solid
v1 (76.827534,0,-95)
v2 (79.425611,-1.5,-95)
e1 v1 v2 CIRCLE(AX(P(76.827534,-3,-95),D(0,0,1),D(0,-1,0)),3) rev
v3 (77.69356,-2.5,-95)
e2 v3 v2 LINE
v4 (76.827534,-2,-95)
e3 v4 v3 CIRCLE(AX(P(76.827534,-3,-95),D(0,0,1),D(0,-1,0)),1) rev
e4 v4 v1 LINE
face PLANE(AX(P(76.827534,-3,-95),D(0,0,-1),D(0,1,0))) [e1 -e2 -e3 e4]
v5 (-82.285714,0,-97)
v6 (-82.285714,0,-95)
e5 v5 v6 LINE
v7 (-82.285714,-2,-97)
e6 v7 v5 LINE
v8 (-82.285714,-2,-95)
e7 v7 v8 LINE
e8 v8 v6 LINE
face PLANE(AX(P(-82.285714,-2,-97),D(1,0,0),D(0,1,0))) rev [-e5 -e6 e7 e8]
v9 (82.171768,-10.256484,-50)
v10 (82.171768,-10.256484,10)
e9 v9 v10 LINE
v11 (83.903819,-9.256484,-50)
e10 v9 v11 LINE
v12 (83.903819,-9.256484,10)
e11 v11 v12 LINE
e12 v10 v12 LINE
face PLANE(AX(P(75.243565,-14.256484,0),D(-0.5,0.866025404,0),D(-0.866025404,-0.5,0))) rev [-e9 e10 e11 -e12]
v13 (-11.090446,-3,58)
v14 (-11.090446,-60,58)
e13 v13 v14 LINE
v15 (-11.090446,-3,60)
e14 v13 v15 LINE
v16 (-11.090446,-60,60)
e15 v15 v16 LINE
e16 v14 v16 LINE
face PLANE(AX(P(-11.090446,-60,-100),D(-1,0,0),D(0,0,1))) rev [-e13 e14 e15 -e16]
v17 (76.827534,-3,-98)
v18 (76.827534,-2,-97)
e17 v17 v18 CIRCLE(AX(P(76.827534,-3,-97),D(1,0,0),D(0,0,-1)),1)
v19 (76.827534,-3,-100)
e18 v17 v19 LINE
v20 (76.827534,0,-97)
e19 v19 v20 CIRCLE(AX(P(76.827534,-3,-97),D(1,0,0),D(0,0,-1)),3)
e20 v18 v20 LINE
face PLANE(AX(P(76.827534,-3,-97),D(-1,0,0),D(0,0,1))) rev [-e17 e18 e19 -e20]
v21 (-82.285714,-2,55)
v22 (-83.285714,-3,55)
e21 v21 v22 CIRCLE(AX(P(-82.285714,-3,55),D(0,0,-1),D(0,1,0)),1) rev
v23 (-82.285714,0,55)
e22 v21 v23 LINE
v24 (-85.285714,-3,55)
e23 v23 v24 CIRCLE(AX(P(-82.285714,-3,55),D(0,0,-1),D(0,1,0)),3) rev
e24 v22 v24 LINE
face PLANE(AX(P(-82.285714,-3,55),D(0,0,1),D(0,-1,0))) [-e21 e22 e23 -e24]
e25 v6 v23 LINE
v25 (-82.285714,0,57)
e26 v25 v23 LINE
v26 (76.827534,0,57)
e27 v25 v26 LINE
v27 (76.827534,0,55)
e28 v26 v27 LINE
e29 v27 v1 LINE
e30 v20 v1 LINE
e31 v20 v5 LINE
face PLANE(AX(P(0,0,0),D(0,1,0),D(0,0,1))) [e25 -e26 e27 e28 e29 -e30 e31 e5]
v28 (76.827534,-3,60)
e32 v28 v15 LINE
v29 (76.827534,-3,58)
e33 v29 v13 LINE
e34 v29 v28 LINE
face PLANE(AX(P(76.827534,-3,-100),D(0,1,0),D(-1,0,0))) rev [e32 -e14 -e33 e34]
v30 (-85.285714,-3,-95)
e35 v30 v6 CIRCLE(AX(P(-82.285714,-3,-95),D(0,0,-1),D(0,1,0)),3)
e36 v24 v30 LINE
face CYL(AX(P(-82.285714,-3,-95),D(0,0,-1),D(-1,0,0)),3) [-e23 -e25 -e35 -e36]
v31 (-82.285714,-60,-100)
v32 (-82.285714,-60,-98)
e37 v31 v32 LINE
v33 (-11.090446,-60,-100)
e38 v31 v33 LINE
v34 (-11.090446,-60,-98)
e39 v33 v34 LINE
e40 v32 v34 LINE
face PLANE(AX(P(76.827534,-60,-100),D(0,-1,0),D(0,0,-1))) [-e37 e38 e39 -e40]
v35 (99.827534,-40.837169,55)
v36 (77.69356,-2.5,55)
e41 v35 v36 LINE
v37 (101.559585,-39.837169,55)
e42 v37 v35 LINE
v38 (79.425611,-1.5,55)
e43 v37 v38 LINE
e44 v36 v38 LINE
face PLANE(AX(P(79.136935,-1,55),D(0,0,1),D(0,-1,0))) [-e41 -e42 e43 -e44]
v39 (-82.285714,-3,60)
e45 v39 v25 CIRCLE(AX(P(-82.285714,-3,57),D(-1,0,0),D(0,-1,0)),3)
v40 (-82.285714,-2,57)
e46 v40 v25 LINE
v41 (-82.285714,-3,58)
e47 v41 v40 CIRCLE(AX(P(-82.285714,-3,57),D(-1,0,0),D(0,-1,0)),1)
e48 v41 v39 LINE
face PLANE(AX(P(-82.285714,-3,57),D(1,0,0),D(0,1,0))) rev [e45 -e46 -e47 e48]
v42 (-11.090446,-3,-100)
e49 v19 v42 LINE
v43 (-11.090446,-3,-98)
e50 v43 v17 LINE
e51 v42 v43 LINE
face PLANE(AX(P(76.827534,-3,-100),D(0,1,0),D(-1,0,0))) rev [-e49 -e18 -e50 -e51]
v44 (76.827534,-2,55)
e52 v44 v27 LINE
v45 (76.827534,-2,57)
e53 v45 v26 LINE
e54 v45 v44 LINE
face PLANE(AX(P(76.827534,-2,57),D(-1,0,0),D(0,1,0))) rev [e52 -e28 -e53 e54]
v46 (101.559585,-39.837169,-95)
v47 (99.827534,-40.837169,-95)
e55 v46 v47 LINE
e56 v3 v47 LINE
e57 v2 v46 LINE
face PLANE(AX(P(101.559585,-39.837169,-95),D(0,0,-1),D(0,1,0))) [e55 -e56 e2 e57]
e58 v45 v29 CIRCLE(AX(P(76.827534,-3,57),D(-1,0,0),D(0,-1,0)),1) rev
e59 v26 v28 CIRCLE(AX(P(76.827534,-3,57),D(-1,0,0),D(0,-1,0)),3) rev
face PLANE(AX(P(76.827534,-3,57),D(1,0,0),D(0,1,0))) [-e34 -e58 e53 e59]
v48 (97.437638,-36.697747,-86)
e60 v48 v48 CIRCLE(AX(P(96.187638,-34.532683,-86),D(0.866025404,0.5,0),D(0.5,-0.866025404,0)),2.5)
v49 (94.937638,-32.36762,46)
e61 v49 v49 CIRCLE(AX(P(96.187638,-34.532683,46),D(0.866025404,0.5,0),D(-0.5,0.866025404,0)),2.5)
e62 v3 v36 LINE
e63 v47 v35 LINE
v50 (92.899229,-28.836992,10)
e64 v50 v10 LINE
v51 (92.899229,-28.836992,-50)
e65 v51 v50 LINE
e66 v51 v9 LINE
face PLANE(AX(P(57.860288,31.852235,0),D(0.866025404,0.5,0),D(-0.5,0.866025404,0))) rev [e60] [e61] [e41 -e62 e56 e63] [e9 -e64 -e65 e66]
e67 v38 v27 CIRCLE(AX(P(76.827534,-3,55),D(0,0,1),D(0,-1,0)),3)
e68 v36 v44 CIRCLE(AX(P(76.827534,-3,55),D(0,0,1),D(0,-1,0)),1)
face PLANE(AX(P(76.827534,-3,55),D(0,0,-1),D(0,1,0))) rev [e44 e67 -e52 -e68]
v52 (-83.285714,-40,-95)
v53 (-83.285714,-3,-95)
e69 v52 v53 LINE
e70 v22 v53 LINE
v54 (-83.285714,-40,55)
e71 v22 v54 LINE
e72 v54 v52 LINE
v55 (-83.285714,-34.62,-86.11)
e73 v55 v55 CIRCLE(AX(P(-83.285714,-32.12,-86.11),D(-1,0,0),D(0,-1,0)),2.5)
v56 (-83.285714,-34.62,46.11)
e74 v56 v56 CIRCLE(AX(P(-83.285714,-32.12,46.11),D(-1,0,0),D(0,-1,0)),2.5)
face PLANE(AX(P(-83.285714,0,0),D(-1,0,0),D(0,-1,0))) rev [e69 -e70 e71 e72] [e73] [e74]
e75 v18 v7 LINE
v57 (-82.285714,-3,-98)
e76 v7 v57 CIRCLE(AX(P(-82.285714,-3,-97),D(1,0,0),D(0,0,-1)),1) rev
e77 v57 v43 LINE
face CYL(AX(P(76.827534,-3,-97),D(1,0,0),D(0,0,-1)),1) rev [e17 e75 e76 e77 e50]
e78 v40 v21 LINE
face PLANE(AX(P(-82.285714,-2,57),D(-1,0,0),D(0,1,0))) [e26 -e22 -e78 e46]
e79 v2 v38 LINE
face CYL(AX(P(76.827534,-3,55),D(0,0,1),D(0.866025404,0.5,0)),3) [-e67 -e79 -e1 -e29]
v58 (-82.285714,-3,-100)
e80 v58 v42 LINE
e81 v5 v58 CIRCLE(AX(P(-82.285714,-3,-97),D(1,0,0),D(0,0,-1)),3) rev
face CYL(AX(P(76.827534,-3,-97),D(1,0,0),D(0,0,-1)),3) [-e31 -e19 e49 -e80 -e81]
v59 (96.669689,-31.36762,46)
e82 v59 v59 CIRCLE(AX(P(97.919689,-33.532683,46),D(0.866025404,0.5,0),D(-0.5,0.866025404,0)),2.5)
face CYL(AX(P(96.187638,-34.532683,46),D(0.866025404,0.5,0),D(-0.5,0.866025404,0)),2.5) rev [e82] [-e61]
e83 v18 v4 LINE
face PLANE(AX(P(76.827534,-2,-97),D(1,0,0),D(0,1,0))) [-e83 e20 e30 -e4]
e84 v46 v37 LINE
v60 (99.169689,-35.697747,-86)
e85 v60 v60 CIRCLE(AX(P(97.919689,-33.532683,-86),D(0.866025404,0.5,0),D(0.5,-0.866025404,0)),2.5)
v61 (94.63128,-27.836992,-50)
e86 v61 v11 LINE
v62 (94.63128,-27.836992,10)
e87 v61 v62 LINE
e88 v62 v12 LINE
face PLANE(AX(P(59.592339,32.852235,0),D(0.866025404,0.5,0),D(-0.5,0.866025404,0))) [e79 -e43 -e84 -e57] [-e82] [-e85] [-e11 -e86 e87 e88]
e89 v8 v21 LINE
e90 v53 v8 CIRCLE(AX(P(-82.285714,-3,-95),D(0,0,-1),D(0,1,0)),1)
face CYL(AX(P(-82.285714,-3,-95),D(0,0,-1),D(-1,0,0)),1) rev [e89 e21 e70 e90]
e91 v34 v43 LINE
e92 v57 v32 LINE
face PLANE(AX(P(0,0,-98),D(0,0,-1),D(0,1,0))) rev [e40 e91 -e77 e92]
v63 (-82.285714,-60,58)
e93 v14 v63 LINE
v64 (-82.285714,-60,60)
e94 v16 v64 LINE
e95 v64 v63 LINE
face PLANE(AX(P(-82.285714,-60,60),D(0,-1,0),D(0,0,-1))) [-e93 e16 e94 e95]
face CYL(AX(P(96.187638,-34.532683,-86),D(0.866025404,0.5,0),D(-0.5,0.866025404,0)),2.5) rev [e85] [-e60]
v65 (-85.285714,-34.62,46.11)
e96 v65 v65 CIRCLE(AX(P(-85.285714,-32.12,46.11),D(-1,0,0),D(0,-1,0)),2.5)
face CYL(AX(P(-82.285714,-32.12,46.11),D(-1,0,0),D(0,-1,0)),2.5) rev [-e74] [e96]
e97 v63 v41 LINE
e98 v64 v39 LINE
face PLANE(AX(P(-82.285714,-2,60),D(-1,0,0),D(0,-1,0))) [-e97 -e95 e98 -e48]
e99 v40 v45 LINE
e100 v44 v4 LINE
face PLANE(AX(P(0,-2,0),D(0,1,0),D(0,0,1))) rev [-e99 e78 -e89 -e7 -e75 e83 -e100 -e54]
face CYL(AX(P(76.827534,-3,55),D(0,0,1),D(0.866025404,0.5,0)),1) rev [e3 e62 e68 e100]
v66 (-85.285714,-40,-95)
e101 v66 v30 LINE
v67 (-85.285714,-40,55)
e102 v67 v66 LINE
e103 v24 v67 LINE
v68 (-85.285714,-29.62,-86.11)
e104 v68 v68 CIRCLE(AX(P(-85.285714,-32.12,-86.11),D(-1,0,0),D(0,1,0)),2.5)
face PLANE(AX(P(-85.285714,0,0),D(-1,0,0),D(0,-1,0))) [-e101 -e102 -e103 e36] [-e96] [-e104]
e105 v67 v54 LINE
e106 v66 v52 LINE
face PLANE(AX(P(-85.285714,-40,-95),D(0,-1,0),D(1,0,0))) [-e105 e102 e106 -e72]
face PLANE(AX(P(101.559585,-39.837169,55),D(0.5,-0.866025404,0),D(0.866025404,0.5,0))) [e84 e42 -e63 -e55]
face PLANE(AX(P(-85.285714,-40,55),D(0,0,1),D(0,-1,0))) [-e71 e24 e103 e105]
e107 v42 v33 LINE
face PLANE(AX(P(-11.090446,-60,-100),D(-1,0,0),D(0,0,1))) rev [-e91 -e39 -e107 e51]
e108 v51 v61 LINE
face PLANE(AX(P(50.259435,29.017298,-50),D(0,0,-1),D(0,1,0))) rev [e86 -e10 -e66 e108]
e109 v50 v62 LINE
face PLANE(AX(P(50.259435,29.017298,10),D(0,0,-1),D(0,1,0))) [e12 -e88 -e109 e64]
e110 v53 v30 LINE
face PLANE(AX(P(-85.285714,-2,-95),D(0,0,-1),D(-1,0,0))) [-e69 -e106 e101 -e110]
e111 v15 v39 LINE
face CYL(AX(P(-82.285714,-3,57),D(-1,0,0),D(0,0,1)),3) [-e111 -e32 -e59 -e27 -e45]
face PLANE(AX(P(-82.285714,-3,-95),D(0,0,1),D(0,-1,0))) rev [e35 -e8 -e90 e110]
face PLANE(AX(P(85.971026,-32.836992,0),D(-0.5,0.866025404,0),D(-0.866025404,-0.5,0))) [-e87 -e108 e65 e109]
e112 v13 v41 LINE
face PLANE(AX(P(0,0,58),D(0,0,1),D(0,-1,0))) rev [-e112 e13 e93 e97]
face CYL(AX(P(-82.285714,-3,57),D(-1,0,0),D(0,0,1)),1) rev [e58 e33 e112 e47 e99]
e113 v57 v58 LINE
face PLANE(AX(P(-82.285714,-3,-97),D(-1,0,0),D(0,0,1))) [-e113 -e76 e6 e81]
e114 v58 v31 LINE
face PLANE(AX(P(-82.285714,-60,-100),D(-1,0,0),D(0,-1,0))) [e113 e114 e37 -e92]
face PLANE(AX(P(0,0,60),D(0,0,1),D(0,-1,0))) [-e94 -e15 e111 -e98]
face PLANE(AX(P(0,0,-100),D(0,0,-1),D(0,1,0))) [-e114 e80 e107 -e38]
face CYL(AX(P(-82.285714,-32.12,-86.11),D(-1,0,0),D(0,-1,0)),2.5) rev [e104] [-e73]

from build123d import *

# Parameters (mm, degrees)
SKETCH1_W                    = 160
SKETCH1_H                    = 150
BASE_FLANGE1_DEPTH           = 2
EDGE_FLANGE1_START           = -95
EDGE_FLANGE1_DEPTH           = 150
EDGE_FLANGE2_STRIP_W         = 20
EDGE_FLANGE2_STRIP_H         = 2
EDGE_FLANGE2_STRIP_CUT_DEPTH = 150
EDGE_FLANGE2_DEPTH           = 150
EDGE_FLANGE4_DEPTH           = 159.113248654
EDGE_FLANGE5_DEPTH           = 159.113248654
SKETCH32_W                   = 30
SKETCH32_H                   = 21.454922416
CUT_EXTRUDE2_DEPTH           = 10
SKETCH33_W                   = 87.917980444
SKETCH33_H                   = 57
CUT_EXTRUDE3_DEPTH           = 199.782165551
SKETCH38_R                   = 2.5
CUT_EXTRUDE5_DEPTH           = 2
SKETCH39_R                   = 2.5
CUT_EXTRUDE6_DEPTH           = 3


# Read off the part's stored shape, not the designer's step: Edge-Flange1
# Sheet-metal steps are written as plain solids
with BuildPart() as part:
    # Sketch1 → Base-Flange1 (new body)
    with BuildSketch(Plane(origin=(0, 0, 0), x_dir=(1, 0, 0), z_dir=(0, 1, 0))):
        with Locations((-5.285714286, 20)):
            Rectangle(SKETCH1_W, SKETCH1_H)
    extrude(amount=-BASE_FLANGE1_DEPTH)

    # Edge-Flange1 outline → Edge-Flange1 (add)
    with BuildSketch(Plane.XY.offset(EDGE_FLANGE1_START)):
        with BuildLine():
            Line((101.559585176, -39.837168574), (79.42561058, -1.5))
            ThreePointArc((79.42561058, -1.5), (78.327534368, -0.401923789), (76.827534368, 0))
            Line((76.827534368, 0), (74.714285714, 0))
            Line((74.714285714, 0), (74.714285714, -2))
            Line((74.714285714, -2), (76.827534368, -2))
            ThreePointArc((76.827534368, -2), (77.327534368, -2.133974596), (77.693559772, -2.5))
            Line((77.693559772, -2.5), (99.827534368, -40.837168574))
            Line((99.827534368, -40.837168574), (101.559585176, -39.837168574))
        make_face()
    extrude(amount=EDGE_FLANGE1_DEPTH)

    # Edge-Flange2 strip (across the edge) → Edge-Flange2 strip cut (cut)
    with BuildSketch(Plane(origin=(-85.285714286, -2, 55), x_dir=(1, 0, 0), z_dir=(0, 0, -1))):
        with Locations((-7, -1)):
            Rectangle(EDGE_FLANGE2_STRIP_W, EDGE_FLANGE2_STRIP_H)
    extrude(amount=EDGE_FLANGE2_STRIP_CUT_DEPTH, mode=Mode.SUBTRACT)

    # Edge-Flange2 section (across the edge) → Edge-Flange2 (add)
    with BuildSketch(Plane(origin=(-85.285714286, -2, 55), x_dir=(1, 0, 0), z_dir=(0, 0, -1))):
        with BuildLine():
            Line((0, 1), (0, 38))
            Line((0, 38), (2, 38))
            Line((2, 38), (2, 1))
            ThreePointArc((2, 1), (2.292893219, 0.292893219), (3, 0))
            Line((3, 0), (3, -2))
            ThreePointArc((3, -2), (0.878679656, -1.121320344), (0, 1))
        make_face()
    extrude(amount=EDGE_FLANGE2_DEPTH)

    # Edge-Flange4 section (across the edge) → Edge-Flange4 (add)
    with BuildSketch(Plane(origin=(76.827534368, -2, 60), x_dir=(0, 0, -1), z_dir=(-1, 0, 0))):
        with BuildLine():
            Line((0, 1), (0, 58))
            Line((0, 58), (2, 58))
            Line((2, 58), (2, 1))
            ThreePointArc((2, 1), (2.292893219, 0.292893219), (3, 0))
            Line((3, 0), (5, 0))
            Line((5, 0), (5, -2))
            Line((5, -2), (3, -2))
            ThreePointArc((3, -2), (0.878679656, -1.121320344), (0, 1))
        make_face()
    extrude(amount=EDGE_FLANGE4_DEPTH)

    # Edge-Flange5 section (across the edge) → Edge-Flange5 (add)
    with BuildSketch(Plane(origin=(-82.285714286, -2, -100), x_dir=(0, 0, 1), z_dir=(1, 0, 0))):
        with BuildLine():
            Line((0, 1), (0, 58))
            Line((0, 58), (2, 58))
            Line((2, 58), (2, 1))
            ThreePointArc((2, 1), (2.292893219, 0.292893219), (3, 0))
            Line((3, 0), (5, 0))
            Line((5, 0), (5, -2))
            Line((5, -2), (3, -2))
            ThreePointArc((3, -2), (0.878679656, -1.121320344), (0, 1))
        make_face()
    extrude(amount=EDGE_FLANGE5_DEPTH)

    # Sketch32 → Cut-Extrude2 (cut)
    with BuildSketch(Plane(origin=(58.919688882, 34.017298237, 0), x_dir=(0, 0, -1), z_dir=(0.8660254037844364, 0.5000000000000039, 0))):
        with Locations((5, -60.695720616)):
            Rectangle(SKETCH32_W, SKETCH32_H)
        with Locations((35, -60.695720616)):
            Rectangle(SKETCH32_W, SKETCH32_H)
    extrude(amount=-CUT_EXTRUDE2_DEPTH, mode=Mode.SUBTRACT)

    # Sketch33 → Cut-Extrude3 (cut, through all)
    with BuildSketch(Plane.XY.offset(60)):
        with Locations((32.868544146, -31.5)):
            Rectangle(SKETCH33_W, SKETCH33_H)
    extrude(amount=-CUT_EXTRUDE3_DEPTH, mode=Mode.SUBTRACT)

    # Sketch38 → Cut-Extrude5 (cut)
    with BuildSketch(Plane(origin=(58.919688882, 34.017298237, 0), x_dir=(0, 0, -1), z_dir=(0.8660254037844363, 0.5000000000000042, 0))):
        with Locations(Location((-46, -78, 0), (0, 0, 90))):
            Circle(SKETCH38_R)
        with Locations(Location((86, -78, 0), (0, 0, 270))):
            Circle(SKETCH38_R)
    extrude(amount=-CUT_EXTRUDE5_DEPTH, mode=Mode.SUBTRACT)

    # Sketch39 → Cut-Extrude6 (cut)
    with BuildSketch(Plane.ZY.offset(85.285714286)):
        with Locations(Location((46.11, -32.12, 0), (0, 0, 270))):
            Circle(SKETCH39_R)
        with Locations(Location((-86.11, -32.12, 0), (0, 0, 270))):
            Circle(SKETCH39_R)
    extrude(amount=-CUT_EXTRUDE6_DEPTH, mode=Mode.SUBTRACT)


solid = part.part
